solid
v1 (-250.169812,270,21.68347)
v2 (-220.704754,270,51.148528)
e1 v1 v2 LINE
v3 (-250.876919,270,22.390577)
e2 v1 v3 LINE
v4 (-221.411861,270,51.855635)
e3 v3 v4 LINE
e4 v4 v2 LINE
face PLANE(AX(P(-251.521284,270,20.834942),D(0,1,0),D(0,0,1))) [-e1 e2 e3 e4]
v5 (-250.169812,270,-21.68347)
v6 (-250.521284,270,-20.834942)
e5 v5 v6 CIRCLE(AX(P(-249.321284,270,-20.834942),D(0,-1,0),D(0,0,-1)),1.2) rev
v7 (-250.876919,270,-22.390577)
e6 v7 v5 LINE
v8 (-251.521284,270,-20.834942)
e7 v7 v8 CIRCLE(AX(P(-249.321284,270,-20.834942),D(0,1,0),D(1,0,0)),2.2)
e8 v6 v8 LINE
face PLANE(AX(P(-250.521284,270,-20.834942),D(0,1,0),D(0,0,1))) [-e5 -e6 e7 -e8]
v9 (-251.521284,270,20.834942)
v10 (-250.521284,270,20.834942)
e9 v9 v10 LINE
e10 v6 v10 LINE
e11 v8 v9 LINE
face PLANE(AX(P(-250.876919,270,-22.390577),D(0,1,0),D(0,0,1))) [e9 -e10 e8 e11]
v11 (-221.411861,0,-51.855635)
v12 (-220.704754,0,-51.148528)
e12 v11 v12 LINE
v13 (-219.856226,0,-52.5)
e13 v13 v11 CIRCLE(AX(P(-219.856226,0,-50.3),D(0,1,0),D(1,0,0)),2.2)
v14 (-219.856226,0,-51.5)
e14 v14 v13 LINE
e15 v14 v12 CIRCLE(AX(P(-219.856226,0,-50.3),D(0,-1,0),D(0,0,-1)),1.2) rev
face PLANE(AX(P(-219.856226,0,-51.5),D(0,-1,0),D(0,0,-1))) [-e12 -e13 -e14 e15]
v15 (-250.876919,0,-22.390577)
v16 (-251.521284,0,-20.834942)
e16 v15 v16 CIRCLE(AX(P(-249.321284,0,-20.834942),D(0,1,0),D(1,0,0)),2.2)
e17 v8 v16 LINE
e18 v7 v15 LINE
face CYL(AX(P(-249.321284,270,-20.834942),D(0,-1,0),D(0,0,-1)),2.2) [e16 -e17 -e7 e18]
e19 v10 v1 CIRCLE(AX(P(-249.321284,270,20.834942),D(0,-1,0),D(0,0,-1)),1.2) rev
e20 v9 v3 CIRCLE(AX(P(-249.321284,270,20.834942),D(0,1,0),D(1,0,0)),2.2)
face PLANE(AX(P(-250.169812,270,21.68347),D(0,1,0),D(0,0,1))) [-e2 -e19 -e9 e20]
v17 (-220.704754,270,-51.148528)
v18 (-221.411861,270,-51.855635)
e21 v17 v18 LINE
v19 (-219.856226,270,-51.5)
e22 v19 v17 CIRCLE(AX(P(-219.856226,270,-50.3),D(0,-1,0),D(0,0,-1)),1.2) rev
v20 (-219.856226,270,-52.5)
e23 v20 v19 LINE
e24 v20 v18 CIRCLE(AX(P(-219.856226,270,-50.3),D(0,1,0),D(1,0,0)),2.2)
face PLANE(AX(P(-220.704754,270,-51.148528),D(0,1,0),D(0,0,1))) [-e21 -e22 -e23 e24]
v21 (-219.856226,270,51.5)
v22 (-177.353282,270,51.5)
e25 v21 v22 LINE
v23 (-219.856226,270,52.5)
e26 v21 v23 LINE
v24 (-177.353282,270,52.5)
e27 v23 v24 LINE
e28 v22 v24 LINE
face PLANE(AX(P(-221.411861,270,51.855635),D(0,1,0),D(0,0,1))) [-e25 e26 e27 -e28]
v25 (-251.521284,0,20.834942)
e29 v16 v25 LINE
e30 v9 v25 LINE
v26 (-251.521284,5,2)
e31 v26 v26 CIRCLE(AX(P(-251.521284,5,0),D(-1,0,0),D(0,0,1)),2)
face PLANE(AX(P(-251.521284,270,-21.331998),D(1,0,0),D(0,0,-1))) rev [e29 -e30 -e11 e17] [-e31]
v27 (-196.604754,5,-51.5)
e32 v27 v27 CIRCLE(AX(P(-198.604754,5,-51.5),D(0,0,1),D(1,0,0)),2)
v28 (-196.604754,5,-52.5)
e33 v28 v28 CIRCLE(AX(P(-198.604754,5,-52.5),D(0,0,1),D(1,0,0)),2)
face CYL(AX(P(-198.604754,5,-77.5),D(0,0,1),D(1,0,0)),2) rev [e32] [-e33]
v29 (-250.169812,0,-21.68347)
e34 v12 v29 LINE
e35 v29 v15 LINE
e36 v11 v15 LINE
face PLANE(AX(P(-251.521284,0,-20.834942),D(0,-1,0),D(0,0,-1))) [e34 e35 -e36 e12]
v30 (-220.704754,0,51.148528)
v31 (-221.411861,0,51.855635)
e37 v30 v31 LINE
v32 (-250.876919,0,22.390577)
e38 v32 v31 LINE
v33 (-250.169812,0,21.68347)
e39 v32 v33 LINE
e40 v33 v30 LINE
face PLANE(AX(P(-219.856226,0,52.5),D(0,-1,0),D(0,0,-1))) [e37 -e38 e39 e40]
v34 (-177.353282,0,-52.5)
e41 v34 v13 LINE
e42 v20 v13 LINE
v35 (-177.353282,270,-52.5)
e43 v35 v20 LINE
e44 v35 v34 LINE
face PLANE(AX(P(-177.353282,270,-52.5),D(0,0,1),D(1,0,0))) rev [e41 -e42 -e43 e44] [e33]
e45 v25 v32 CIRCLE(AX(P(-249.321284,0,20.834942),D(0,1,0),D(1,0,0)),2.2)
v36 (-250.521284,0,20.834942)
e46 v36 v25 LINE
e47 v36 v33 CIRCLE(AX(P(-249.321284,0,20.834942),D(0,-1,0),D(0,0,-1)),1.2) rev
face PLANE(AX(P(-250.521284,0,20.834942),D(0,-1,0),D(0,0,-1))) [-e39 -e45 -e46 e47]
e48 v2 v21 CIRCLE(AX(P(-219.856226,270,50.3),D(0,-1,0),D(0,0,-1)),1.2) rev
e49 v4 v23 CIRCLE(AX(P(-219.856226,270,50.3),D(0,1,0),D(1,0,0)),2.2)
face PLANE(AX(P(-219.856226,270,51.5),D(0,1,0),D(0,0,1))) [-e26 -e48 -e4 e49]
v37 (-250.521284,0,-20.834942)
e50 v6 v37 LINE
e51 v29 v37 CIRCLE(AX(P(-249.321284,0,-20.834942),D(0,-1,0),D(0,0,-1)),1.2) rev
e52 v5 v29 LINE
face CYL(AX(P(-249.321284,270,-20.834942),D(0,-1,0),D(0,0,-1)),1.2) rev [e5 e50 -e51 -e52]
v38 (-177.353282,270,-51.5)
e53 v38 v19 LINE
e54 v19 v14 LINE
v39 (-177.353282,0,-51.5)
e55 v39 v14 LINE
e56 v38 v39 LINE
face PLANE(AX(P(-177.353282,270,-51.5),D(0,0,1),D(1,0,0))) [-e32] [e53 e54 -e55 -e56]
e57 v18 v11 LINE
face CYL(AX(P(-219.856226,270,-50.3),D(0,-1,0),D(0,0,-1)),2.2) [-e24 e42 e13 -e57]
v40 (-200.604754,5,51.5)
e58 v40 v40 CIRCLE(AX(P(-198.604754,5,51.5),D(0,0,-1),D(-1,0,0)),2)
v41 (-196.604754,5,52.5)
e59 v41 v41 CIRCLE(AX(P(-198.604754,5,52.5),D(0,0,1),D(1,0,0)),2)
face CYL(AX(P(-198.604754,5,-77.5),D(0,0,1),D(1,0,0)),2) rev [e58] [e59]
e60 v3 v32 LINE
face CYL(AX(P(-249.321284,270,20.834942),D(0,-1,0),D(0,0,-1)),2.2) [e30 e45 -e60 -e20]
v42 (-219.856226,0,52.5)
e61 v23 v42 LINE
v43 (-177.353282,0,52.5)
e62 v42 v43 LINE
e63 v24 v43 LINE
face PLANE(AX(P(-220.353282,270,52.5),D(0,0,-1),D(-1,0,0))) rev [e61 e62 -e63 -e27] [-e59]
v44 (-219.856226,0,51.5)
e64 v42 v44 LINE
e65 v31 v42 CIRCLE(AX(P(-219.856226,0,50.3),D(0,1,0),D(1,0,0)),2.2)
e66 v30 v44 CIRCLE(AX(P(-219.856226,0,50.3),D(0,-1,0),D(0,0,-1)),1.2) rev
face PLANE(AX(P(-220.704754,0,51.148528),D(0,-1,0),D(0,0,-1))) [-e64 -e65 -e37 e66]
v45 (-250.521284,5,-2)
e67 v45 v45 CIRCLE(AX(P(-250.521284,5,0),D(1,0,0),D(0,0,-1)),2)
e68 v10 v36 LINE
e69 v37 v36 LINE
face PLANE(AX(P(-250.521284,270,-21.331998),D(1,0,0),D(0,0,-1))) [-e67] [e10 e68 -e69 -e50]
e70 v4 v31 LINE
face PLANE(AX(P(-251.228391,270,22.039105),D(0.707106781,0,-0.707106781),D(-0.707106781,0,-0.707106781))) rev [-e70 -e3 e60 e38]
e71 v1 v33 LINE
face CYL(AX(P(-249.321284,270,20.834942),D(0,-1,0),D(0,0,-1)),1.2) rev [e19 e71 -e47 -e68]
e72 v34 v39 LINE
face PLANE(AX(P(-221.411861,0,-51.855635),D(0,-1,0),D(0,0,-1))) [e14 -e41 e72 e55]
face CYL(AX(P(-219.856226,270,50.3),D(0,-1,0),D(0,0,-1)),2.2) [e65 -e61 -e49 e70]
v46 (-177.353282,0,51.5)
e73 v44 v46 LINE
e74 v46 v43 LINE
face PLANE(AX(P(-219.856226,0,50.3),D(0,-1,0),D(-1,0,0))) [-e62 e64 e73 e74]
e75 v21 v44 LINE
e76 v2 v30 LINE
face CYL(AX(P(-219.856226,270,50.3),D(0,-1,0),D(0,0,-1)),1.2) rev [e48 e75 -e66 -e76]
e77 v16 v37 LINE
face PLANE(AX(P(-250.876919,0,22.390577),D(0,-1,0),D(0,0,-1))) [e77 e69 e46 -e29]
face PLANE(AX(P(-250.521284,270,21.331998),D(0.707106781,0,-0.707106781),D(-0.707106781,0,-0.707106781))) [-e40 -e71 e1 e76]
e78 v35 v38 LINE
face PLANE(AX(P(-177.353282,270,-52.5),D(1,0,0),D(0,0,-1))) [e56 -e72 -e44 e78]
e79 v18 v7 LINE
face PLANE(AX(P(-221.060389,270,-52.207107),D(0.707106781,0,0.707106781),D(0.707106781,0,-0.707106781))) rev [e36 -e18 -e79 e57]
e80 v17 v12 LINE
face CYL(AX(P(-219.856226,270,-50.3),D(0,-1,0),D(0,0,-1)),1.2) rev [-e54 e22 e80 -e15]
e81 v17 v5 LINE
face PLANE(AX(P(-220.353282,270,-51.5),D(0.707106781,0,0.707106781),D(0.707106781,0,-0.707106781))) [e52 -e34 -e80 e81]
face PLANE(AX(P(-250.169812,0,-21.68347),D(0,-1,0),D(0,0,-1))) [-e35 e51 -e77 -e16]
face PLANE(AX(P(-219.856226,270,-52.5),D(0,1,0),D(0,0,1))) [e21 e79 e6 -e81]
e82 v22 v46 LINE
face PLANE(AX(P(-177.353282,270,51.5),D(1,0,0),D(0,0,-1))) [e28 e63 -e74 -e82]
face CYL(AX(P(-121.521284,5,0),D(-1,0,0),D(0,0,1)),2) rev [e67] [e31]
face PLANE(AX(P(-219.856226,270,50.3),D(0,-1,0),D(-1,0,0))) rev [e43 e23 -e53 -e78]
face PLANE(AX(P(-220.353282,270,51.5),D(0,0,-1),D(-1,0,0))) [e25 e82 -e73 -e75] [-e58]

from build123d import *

# Parameters (mm, degrees)
SM_BASE_FLANGE_1_DEPTH = 270
SKETCH_2_R             = 2
CUT_EXTRUDE_1_DEPTH    = 130
SKETCH_3_R             = 2
CUT_EXTRUDE_2_DEPTH    = 130


# Sheet-metal steps are written as plain solids
with BuildPart() as part:
    # Sketch 1 → Базовая кромка1 (new body)
    with BuildSketch(Plane(origin=(0, 0, 0), x_dir=(1, 0, 0), z_dir=(0, 1, 0))):
        with BuildLine():
            Line((-177.353282485, 51.5), (-219.85622621, 51.5))
            ThreePointArc((-219.85622621, 51.5), (-220.315446329, 51.408655439), (-220.704754348, 51.148528137))
            Line((-220.704754348, 51.148528137), (-250.16981216, 21.683470325))
            ThreePointArc((-250.16981216, 21.683470325), (-250.429939462, 21.294162306), (-250.521284023, 20.834942187))
            Line((-250.521284023, 20.834942187), (-250.521284023, -20.834942187))
            ThreePointArc((-250.521284023, -20.834942187), (-250.429939462, -21.294162306), (-250.16981216, -21.683470325))
            Line((-250.16981216, -21.683470325), (-220.704754348, -51.148528137))
            ThreePointArc((-220.704754348, -51.148528137), (-220.315446329, -51.408655439), (-219.85622621, -51.5))
            Line((-219.85622621, -51.5), (-177.353282485, -51.5))
            Line((-177.353282485, -51.5), (-177.353282485, -52.5))
            Line((-177.353282485, -52.5), (-219.85622621, -52.5))
            ThreePointArc((-219.85622621, -52.5), (-220.698129761, -52.332534972), (-221.411861129, -51.855634919))
            Line((-221.411861129, -51.855634919), (-250.876918941, -22.390577106))
            ThreePointArc((-250.876918941, -22.390577106), (-251.353818994, -21.676845739), (-251.521284023, -20.834942187))
            Line((-251.521284023, -20.834942187), (-251.521284023, 20.834942187))
            ThreePointArc((-251.521284023, 20.834942187), (-251.353818994, 21.676845739), (-250.876918941, 22.390577106))
            Line((-250.876918941, 22.390577106), (-221.411861129, 51.855634919))
            ThreePointArc((-221.411861129, 51.855634919), (-220.698129761, 52.332534972), (-219.85622621, 52.5))
            Line((-219.85622621, 52.5), (-177.353282485, 52.5))
            Line((-177.353282485, 52.5), (-177.353282485, 51.5))
        make_face()
    extrude(amount=SM_BASE_FLANGE_1_DEPTH)

    # Эскиз2 → Вырез-Вытянуть1 (cut)
    with BuildSketch(Plane.XY.offset(52.5)):
        with Locations((-198.604754348, 5)):
            Circle(SKETCH_2_R)
    extrude(amount=-CUT_EXTRUDE_1_DEPTH, mode=Mode.SUBTRACT)

    # Эскиз3 → Вырез-Вытянуть2 (cut)
    with BuildSketch(Plane.ZY.offset(251.521284023)):
        with Locations((0, 5)):
            Circle(SKETCH_3_R)
    extrude(amount=-CUT_EXTRUDE_2_DEPTH, mode=Mode.SUBTRACT)


solid = part.part
